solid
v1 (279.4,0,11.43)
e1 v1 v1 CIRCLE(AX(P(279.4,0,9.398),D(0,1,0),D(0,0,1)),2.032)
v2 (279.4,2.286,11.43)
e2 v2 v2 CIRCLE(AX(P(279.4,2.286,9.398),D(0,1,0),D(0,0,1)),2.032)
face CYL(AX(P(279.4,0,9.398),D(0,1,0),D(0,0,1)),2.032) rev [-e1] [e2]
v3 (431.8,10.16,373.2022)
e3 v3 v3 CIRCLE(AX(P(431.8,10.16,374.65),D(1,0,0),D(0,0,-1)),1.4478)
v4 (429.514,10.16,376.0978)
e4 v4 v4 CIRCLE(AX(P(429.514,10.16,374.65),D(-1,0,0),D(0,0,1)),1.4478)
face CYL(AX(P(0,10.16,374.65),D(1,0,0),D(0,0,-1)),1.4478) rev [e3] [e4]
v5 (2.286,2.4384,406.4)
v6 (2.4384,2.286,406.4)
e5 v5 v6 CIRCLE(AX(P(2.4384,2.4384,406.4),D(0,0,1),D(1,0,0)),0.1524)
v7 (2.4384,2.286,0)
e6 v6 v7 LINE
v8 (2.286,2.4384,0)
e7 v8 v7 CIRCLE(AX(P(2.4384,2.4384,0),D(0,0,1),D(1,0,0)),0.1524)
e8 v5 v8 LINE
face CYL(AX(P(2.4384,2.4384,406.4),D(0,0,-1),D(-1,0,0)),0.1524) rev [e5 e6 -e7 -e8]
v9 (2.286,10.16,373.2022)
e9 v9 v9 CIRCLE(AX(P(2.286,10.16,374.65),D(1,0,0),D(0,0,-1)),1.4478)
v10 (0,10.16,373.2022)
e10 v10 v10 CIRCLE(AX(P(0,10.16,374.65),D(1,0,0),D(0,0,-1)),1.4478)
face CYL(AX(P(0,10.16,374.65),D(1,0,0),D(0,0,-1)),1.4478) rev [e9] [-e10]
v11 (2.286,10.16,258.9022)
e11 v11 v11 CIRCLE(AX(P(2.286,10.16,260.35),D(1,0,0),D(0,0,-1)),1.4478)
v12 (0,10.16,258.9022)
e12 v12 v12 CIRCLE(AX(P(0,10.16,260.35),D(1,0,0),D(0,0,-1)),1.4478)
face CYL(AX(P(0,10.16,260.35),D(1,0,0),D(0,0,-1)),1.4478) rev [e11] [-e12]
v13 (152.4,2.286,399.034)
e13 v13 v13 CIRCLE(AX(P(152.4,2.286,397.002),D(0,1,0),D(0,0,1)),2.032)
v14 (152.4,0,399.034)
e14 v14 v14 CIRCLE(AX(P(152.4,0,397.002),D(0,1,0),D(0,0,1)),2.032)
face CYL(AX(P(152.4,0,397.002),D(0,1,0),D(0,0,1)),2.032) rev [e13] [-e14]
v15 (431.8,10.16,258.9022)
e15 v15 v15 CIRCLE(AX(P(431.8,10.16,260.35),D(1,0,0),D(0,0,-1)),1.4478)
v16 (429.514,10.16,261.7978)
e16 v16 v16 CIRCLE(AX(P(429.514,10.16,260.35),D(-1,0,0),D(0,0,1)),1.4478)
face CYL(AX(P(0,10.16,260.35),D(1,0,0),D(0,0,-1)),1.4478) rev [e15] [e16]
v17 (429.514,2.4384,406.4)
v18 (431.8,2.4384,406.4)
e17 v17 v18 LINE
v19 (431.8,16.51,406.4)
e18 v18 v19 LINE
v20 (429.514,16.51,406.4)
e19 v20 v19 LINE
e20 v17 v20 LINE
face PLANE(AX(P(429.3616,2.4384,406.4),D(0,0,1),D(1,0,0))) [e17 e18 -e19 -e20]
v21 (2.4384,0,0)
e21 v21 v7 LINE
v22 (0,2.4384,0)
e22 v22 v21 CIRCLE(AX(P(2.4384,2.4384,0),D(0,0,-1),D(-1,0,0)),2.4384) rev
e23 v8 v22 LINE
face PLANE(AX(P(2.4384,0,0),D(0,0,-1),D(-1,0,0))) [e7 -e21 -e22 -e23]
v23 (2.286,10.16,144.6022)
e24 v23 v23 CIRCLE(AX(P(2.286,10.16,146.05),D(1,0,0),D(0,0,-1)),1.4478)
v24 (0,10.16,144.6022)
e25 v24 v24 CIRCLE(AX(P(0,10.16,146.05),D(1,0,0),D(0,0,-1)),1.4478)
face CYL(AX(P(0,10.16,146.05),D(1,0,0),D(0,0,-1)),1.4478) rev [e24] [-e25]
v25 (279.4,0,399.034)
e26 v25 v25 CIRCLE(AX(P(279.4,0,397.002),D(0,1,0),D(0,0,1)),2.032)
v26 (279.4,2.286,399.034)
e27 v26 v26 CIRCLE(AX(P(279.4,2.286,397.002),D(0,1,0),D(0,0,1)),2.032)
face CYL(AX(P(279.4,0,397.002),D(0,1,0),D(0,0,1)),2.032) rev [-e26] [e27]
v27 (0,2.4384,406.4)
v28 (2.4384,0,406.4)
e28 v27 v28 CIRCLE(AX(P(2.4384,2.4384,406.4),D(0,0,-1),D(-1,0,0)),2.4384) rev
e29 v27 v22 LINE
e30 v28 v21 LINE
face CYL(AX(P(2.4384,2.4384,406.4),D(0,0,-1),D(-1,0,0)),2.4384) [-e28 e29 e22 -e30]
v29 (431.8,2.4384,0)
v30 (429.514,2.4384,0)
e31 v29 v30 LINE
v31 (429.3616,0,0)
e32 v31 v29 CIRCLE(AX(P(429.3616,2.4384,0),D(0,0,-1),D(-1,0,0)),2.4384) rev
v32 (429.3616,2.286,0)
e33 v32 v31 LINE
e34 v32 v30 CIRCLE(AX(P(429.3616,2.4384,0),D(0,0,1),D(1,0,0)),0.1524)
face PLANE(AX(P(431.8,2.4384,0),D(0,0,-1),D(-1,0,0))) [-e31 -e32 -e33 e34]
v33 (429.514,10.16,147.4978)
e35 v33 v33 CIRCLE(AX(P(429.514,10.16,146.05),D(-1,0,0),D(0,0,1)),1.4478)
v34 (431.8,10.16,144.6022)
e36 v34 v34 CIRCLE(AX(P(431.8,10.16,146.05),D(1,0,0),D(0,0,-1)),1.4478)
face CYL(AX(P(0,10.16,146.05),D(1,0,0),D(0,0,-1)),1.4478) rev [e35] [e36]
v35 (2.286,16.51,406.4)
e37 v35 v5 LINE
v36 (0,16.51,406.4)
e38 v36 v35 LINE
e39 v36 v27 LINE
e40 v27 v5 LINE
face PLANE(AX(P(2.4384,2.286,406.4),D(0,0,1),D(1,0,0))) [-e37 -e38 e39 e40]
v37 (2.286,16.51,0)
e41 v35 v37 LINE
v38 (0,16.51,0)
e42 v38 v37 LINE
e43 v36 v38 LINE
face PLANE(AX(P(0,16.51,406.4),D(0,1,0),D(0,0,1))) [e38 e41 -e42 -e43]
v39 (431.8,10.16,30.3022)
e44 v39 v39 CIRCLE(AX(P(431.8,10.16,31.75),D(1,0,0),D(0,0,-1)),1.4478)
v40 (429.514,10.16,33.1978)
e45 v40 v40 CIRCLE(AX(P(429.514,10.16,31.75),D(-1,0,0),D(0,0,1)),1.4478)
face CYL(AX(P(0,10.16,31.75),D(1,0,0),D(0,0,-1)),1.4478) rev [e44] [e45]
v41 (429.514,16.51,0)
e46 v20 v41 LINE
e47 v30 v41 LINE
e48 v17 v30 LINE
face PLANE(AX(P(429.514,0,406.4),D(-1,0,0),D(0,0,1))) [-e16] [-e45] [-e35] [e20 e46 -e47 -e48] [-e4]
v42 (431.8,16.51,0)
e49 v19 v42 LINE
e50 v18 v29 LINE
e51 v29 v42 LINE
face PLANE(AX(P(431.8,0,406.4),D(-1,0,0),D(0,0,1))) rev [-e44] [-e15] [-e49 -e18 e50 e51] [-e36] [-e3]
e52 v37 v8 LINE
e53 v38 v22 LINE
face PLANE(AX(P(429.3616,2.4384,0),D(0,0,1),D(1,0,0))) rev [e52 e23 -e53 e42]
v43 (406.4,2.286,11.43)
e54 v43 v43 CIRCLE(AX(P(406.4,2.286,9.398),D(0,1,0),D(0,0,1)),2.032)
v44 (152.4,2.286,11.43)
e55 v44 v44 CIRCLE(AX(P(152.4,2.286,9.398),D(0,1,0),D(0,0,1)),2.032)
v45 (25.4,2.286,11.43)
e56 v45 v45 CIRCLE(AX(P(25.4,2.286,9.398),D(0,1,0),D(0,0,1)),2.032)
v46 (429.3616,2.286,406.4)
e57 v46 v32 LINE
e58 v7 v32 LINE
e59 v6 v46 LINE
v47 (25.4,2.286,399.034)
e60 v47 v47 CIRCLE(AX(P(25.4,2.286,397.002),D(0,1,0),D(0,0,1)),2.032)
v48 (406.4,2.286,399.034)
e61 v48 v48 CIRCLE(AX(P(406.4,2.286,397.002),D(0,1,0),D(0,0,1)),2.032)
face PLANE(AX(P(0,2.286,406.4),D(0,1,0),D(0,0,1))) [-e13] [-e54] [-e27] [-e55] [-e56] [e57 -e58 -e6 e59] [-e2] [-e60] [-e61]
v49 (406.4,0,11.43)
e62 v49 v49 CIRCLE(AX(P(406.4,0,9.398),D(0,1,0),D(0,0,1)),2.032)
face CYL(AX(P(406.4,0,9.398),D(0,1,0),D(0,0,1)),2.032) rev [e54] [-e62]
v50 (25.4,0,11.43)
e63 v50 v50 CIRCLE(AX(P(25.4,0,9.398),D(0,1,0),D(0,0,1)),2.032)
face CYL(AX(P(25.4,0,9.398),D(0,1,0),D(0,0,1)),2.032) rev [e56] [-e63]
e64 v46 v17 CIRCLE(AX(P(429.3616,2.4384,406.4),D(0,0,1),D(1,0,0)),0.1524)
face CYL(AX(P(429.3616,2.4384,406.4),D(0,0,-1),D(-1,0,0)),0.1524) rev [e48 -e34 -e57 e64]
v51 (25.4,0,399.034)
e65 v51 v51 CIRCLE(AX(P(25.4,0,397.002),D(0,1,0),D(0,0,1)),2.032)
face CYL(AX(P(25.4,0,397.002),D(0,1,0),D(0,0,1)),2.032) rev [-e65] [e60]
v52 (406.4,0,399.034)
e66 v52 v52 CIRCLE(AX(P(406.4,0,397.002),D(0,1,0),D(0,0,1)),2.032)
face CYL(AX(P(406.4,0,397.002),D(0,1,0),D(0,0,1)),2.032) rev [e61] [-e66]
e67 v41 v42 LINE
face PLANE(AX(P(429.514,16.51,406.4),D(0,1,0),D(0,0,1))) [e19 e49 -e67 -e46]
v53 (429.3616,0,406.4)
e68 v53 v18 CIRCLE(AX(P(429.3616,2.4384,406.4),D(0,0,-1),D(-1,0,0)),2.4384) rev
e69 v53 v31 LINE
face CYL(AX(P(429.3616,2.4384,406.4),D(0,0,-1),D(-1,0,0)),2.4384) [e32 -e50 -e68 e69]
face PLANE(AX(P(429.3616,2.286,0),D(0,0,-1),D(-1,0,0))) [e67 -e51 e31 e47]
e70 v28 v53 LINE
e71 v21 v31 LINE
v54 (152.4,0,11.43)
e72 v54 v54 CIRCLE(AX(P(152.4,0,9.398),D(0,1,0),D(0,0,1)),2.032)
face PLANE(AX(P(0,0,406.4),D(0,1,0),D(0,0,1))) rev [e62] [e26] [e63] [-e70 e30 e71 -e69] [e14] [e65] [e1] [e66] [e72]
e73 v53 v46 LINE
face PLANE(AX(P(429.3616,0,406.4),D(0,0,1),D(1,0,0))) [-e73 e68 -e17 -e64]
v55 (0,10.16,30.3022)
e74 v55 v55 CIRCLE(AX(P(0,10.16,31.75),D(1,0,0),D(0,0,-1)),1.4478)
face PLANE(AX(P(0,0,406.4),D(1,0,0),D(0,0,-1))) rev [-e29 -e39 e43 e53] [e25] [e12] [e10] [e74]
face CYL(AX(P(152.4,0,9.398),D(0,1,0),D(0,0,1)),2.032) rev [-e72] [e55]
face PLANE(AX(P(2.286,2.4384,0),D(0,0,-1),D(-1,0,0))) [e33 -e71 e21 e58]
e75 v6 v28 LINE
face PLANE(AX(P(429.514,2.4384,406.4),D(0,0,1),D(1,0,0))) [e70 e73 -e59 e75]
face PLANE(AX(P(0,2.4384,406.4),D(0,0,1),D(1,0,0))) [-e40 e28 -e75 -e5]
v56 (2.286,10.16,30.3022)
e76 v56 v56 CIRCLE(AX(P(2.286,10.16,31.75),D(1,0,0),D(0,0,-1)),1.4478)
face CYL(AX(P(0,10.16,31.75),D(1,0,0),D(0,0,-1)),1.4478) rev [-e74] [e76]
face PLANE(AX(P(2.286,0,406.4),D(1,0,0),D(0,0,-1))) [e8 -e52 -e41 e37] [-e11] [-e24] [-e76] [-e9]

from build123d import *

# Parameters (mm, degrees)
BASE_FLANGE3_DEPTH = 406.4
SKETCH10_R         = 1.4478
CUT_EXTRUDE3_DEPTH = 594.198769469
SKETCH11_R         = 2.032
CUT_EXTRUDE4_DEPTH = 594.139546967


# Sheet-metal steps are written as plain solids
with BuildPart() as part:
    # Sketch1 → Base-Flange3 (new body)
    with BuildSketch(Plane.XY):
        with BuildLine():
            Line((431.8, 16.51), (431.8, 2.4384))
            ThreePointArc((431.8, 2.4384), (431.085809175, 0.714190825), (429.3616, 0))
            Line((429.3616, 0), (2.4384, 0))
            ThreePointArc((2.4384, 0), (0.714190825, 0.714190825), (0, 2.4384))
            Line((0, 2.4384), (0, 16.51))
            Line((0, 16.51), (2.286, 16.51))
            Line((2.286, 16.51), (2.286, 2.4384))
            ThreePointArc((2.286, 2.4384), (2.330636927, 2.330636927), (2.4384, 2.286))
            Line((2.4384, 2.286), (429.3616, 2.286))
            ThreePointArc((429.3616, 2.286), (429.469363073, 2.330636927), (429.514, 2.4384))
            Line((429.514, 2.4384), (429.514, 16.51))
            Line((429.514, 16.51), (431.8, 16.51))
        make_face()
    extrude(amount=BASE_FLANGE3_DEPTH)

    # Sketch10 → Cut-Extrude3 (cut, through all)
    with BuildSketch(Plane(origin=(431.8, 0, 0), x_dir=(0, 0, -1), z_dir=(1, 0, 0))):
        with Locations((-31.75, 10.16)):
            Circle(SKETCH10_R)
        with Locations((-146.05, 10.16)):
            Circle(SKETCH10_R)
        with Locations((-260.35, 10.16)):
            Circle(SKETCH10_R)
        with Locations((-374.65, 10.16)):
            Circle(SKETCH10_R)
    extrude(amount=-CUT_EXTRUDE3_DEPTH, mode=Mode.SUBTRACT)

    # Sketch11 → Cut-Extrude4 (cut, through all)
    with BuildSketch(Plane(origin=(0, 2.286, 0), x_dir=(-1, 0, 0), z_dir=(0, 1, 0))):
        with Locations(Location((-406.4, 397.002, 0), (0, 0, 90))):
            Circle(SKETCH11_R)
        with Locations(Location((-279.4, 397.002, 0), (0, 0, 90))):
            Circle(SKETCH11_R)
        with Locations(Location((-152.4, 397.002, 0), (0, 0, 90))):
            Circle(SKETCH11_R)
        with Locations(Location((-25.4, 397.002, 0), (0, 0, 90))):
            Circle(SKETCH11_R)
        with Locations(Location((-406.4, 9.398, 0), (0, 0, 90))):
            Circle(SKETCH11_R)
        with Locations(Location((-279.4, 9.398, 0), (0, 0, 90))):
            Circle(SKETCH11_R)
        with Locations(Location((-152.4, 9.398, 0), (0, 0, 90))):
            Circle(SKETCH11_R)
        with Locations(Location((-25.4, 9.398, 0), (0, 0, 90))):
            Circle(SKETCH11_R)
    extrude(amount=-CUT_EXTRUDE4_DEPTH, mode=Mode.SUBTRACT)


solid = part.part
